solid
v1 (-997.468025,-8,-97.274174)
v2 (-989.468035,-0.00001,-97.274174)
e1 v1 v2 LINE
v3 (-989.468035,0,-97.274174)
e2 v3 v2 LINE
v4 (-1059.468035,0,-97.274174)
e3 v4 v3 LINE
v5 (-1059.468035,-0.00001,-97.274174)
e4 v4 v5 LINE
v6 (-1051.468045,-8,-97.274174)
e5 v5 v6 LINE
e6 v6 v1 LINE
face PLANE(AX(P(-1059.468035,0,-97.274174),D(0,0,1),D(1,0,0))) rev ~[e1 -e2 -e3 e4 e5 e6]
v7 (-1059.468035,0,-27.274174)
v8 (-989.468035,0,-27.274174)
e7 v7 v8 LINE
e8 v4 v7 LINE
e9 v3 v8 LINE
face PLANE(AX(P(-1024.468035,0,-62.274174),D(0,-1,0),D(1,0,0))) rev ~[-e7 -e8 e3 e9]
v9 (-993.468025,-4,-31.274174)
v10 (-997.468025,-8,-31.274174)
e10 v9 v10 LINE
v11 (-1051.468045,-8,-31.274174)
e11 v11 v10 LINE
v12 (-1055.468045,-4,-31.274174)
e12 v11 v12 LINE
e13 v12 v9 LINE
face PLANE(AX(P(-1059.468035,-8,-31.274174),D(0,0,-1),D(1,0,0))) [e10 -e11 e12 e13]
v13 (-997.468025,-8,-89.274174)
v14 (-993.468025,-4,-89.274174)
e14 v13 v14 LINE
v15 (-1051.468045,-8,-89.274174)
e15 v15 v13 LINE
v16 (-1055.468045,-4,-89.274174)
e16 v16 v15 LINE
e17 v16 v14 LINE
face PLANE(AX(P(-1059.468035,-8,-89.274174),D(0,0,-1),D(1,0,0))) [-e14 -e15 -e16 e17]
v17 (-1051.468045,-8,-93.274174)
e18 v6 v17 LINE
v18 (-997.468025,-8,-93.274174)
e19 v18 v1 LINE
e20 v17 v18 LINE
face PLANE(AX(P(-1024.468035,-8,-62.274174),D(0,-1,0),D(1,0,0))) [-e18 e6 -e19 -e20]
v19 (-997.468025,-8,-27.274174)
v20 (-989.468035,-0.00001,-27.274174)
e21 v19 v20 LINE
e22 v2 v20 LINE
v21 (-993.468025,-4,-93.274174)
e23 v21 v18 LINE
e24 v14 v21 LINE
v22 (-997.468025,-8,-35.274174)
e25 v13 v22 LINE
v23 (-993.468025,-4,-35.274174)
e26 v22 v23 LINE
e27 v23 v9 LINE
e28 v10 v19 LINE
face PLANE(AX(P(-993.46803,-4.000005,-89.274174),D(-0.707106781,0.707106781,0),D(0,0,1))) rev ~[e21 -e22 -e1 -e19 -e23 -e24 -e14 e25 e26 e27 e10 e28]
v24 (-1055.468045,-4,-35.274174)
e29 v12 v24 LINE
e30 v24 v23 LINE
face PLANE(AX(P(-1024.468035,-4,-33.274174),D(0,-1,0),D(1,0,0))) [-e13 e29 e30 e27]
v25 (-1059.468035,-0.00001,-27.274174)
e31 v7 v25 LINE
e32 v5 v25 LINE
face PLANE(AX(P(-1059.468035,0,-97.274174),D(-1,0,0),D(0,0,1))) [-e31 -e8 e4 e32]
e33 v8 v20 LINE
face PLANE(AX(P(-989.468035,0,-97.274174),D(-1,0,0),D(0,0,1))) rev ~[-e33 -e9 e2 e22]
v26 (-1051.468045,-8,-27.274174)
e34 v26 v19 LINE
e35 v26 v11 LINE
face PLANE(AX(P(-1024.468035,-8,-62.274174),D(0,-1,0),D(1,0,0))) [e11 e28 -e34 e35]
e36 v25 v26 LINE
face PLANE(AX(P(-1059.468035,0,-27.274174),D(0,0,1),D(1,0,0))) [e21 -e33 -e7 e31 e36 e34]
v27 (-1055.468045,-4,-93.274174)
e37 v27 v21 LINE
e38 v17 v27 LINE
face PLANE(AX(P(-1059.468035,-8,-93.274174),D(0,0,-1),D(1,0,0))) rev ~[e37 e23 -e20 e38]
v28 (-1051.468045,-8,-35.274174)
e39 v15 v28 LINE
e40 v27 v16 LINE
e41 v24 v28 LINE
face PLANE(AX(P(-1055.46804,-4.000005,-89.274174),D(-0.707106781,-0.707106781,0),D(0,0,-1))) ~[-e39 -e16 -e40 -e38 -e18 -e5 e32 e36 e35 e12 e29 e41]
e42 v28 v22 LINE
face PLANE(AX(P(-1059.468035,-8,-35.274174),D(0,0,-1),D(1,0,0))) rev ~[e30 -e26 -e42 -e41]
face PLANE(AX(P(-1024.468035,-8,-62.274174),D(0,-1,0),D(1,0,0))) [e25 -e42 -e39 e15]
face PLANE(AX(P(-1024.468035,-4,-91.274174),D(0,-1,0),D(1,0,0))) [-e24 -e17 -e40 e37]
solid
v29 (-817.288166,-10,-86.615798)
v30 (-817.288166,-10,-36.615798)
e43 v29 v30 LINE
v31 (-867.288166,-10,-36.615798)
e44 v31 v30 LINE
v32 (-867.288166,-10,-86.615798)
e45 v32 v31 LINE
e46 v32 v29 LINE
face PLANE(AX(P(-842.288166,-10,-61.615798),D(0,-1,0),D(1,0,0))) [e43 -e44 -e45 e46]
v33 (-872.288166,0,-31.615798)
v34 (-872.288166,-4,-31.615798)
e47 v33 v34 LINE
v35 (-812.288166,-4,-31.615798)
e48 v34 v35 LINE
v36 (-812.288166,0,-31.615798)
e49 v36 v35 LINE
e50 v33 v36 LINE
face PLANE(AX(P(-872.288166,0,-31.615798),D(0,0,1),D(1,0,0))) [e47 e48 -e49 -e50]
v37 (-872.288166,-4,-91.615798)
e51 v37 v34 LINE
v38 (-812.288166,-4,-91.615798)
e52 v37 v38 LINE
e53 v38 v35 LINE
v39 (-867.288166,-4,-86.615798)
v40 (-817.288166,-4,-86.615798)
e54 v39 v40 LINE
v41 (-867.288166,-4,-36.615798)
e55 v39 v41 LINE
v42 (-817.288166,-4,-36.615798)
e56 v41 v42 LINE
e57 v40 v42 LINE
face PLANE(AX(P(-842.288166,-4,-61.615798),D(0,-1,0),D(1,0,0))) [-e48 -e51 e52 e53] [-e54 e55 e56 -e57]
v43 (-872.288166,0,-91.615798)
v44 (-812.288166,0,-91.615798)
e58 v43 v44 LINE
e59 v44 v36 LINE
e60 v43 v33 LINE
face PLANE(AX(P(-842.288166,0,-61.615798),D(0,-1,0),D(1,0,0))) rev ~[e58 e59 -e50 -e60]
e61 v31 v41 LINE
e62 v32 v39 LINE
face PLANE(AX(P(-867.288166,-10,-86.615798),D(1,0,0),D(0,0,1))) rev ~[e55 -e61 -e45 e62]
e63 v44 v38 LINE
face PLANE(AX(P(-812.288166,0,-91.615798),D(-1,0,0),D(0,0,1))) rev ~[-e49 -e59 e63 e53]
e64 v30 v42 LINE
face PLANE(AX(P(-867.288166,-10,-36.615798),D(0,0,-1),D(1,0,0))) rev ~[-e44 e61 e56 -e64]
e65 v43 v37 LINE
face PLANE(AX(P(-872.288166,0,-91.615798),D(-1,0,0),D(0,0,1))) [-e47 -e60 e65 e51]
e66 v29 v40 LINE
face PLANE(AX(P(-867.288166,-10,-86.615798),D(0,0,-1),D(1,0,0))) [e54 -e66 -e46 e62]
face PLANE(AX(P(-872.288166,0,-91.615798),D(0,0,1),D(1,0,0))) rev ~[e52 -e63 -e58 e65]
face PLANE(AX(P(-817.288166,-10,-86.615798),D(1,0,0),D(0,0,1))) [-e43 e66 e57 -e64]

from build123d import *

# Parameters (mm, degrees)
F0_W     = 70
F0_H     = 70
F1_DEPTH = 8
F2_W     = 70
F2_H     = 4
F3_DEPTH = 4
F4_SIZE  = 7.99999
F5_W     = 60
F5_H     = 60
F6_DEPTH = 10
F7_W     = 60
F7_H     = 60
F7_W_2   = 50
F7_H_2   = 50
F8_DEPTH = 6


# Not quite as in the source:
# - a fillet or chamfer is up to 0.001 mm smaller than in the source, because OpenCascade refuses the exact size


with BuildPart() as f1:
    # F0 (on Front) → F1 (new body)
    with BuildSketch(Plane.XZ):
        with Locations((-1024.4680345058, -62.2741735576)):
            Rectangle(F0_W, F0_H)
    extrude(amount=F1_DEPTH)

    # F2 (on face) → F3 (cut)
    with BuildSketch(Plane.XZ.offset(8)):
        with Locations((-1024.4680345058, -33.2741735576)):
            Rectangle(F2_W, F2_H)
        with Locations((-1024.4680345058, -91.2741735576)):
            Rectangle(F2_W, F2_H)
    extrude(amount=-F3_DEPTH, mode=Mode.SUBTRACT)

    # F4 (size 8 in the source; OpenCascade refuses exactly that, so slightly less here)
    f4_edges = [f1.edges().sort_by_distance(p)[0] for p in [
        (-989.468035, -8, -62.274174),
        (-1059.468035, -8, -62.274174),
    ]]
    chamfer(f4_edges, length=F4_SIZE)


with BuildPart() as f6:
    # F5 (on Front) → F6 (new body)
    with BuildSketch(Plane.XZ):
        with Locations((-842.2881662846, -61.6157978558)):
            Rectangle(F5_W, F5_H)
    extrude(amount=F6_DEPTH)

    # F7 (on face) → F8 (cut)
    with BuildSketch(Plane.XZ.offset(10)):
        with Locations((-842.2881662846, -61.6157978558)):
            Rectangle(F7_W, F7_H)
        with Locations((-842.2881662846, -61.6157978558)):
            Rectangle(F7_W_2, F7_H_2, mode=Mode.SUBTRACT)
    extrude(amount=-F8_DEPTH, mode=Mode.SUBTRACT)


solid = Compound([f1.part, f6.part])
